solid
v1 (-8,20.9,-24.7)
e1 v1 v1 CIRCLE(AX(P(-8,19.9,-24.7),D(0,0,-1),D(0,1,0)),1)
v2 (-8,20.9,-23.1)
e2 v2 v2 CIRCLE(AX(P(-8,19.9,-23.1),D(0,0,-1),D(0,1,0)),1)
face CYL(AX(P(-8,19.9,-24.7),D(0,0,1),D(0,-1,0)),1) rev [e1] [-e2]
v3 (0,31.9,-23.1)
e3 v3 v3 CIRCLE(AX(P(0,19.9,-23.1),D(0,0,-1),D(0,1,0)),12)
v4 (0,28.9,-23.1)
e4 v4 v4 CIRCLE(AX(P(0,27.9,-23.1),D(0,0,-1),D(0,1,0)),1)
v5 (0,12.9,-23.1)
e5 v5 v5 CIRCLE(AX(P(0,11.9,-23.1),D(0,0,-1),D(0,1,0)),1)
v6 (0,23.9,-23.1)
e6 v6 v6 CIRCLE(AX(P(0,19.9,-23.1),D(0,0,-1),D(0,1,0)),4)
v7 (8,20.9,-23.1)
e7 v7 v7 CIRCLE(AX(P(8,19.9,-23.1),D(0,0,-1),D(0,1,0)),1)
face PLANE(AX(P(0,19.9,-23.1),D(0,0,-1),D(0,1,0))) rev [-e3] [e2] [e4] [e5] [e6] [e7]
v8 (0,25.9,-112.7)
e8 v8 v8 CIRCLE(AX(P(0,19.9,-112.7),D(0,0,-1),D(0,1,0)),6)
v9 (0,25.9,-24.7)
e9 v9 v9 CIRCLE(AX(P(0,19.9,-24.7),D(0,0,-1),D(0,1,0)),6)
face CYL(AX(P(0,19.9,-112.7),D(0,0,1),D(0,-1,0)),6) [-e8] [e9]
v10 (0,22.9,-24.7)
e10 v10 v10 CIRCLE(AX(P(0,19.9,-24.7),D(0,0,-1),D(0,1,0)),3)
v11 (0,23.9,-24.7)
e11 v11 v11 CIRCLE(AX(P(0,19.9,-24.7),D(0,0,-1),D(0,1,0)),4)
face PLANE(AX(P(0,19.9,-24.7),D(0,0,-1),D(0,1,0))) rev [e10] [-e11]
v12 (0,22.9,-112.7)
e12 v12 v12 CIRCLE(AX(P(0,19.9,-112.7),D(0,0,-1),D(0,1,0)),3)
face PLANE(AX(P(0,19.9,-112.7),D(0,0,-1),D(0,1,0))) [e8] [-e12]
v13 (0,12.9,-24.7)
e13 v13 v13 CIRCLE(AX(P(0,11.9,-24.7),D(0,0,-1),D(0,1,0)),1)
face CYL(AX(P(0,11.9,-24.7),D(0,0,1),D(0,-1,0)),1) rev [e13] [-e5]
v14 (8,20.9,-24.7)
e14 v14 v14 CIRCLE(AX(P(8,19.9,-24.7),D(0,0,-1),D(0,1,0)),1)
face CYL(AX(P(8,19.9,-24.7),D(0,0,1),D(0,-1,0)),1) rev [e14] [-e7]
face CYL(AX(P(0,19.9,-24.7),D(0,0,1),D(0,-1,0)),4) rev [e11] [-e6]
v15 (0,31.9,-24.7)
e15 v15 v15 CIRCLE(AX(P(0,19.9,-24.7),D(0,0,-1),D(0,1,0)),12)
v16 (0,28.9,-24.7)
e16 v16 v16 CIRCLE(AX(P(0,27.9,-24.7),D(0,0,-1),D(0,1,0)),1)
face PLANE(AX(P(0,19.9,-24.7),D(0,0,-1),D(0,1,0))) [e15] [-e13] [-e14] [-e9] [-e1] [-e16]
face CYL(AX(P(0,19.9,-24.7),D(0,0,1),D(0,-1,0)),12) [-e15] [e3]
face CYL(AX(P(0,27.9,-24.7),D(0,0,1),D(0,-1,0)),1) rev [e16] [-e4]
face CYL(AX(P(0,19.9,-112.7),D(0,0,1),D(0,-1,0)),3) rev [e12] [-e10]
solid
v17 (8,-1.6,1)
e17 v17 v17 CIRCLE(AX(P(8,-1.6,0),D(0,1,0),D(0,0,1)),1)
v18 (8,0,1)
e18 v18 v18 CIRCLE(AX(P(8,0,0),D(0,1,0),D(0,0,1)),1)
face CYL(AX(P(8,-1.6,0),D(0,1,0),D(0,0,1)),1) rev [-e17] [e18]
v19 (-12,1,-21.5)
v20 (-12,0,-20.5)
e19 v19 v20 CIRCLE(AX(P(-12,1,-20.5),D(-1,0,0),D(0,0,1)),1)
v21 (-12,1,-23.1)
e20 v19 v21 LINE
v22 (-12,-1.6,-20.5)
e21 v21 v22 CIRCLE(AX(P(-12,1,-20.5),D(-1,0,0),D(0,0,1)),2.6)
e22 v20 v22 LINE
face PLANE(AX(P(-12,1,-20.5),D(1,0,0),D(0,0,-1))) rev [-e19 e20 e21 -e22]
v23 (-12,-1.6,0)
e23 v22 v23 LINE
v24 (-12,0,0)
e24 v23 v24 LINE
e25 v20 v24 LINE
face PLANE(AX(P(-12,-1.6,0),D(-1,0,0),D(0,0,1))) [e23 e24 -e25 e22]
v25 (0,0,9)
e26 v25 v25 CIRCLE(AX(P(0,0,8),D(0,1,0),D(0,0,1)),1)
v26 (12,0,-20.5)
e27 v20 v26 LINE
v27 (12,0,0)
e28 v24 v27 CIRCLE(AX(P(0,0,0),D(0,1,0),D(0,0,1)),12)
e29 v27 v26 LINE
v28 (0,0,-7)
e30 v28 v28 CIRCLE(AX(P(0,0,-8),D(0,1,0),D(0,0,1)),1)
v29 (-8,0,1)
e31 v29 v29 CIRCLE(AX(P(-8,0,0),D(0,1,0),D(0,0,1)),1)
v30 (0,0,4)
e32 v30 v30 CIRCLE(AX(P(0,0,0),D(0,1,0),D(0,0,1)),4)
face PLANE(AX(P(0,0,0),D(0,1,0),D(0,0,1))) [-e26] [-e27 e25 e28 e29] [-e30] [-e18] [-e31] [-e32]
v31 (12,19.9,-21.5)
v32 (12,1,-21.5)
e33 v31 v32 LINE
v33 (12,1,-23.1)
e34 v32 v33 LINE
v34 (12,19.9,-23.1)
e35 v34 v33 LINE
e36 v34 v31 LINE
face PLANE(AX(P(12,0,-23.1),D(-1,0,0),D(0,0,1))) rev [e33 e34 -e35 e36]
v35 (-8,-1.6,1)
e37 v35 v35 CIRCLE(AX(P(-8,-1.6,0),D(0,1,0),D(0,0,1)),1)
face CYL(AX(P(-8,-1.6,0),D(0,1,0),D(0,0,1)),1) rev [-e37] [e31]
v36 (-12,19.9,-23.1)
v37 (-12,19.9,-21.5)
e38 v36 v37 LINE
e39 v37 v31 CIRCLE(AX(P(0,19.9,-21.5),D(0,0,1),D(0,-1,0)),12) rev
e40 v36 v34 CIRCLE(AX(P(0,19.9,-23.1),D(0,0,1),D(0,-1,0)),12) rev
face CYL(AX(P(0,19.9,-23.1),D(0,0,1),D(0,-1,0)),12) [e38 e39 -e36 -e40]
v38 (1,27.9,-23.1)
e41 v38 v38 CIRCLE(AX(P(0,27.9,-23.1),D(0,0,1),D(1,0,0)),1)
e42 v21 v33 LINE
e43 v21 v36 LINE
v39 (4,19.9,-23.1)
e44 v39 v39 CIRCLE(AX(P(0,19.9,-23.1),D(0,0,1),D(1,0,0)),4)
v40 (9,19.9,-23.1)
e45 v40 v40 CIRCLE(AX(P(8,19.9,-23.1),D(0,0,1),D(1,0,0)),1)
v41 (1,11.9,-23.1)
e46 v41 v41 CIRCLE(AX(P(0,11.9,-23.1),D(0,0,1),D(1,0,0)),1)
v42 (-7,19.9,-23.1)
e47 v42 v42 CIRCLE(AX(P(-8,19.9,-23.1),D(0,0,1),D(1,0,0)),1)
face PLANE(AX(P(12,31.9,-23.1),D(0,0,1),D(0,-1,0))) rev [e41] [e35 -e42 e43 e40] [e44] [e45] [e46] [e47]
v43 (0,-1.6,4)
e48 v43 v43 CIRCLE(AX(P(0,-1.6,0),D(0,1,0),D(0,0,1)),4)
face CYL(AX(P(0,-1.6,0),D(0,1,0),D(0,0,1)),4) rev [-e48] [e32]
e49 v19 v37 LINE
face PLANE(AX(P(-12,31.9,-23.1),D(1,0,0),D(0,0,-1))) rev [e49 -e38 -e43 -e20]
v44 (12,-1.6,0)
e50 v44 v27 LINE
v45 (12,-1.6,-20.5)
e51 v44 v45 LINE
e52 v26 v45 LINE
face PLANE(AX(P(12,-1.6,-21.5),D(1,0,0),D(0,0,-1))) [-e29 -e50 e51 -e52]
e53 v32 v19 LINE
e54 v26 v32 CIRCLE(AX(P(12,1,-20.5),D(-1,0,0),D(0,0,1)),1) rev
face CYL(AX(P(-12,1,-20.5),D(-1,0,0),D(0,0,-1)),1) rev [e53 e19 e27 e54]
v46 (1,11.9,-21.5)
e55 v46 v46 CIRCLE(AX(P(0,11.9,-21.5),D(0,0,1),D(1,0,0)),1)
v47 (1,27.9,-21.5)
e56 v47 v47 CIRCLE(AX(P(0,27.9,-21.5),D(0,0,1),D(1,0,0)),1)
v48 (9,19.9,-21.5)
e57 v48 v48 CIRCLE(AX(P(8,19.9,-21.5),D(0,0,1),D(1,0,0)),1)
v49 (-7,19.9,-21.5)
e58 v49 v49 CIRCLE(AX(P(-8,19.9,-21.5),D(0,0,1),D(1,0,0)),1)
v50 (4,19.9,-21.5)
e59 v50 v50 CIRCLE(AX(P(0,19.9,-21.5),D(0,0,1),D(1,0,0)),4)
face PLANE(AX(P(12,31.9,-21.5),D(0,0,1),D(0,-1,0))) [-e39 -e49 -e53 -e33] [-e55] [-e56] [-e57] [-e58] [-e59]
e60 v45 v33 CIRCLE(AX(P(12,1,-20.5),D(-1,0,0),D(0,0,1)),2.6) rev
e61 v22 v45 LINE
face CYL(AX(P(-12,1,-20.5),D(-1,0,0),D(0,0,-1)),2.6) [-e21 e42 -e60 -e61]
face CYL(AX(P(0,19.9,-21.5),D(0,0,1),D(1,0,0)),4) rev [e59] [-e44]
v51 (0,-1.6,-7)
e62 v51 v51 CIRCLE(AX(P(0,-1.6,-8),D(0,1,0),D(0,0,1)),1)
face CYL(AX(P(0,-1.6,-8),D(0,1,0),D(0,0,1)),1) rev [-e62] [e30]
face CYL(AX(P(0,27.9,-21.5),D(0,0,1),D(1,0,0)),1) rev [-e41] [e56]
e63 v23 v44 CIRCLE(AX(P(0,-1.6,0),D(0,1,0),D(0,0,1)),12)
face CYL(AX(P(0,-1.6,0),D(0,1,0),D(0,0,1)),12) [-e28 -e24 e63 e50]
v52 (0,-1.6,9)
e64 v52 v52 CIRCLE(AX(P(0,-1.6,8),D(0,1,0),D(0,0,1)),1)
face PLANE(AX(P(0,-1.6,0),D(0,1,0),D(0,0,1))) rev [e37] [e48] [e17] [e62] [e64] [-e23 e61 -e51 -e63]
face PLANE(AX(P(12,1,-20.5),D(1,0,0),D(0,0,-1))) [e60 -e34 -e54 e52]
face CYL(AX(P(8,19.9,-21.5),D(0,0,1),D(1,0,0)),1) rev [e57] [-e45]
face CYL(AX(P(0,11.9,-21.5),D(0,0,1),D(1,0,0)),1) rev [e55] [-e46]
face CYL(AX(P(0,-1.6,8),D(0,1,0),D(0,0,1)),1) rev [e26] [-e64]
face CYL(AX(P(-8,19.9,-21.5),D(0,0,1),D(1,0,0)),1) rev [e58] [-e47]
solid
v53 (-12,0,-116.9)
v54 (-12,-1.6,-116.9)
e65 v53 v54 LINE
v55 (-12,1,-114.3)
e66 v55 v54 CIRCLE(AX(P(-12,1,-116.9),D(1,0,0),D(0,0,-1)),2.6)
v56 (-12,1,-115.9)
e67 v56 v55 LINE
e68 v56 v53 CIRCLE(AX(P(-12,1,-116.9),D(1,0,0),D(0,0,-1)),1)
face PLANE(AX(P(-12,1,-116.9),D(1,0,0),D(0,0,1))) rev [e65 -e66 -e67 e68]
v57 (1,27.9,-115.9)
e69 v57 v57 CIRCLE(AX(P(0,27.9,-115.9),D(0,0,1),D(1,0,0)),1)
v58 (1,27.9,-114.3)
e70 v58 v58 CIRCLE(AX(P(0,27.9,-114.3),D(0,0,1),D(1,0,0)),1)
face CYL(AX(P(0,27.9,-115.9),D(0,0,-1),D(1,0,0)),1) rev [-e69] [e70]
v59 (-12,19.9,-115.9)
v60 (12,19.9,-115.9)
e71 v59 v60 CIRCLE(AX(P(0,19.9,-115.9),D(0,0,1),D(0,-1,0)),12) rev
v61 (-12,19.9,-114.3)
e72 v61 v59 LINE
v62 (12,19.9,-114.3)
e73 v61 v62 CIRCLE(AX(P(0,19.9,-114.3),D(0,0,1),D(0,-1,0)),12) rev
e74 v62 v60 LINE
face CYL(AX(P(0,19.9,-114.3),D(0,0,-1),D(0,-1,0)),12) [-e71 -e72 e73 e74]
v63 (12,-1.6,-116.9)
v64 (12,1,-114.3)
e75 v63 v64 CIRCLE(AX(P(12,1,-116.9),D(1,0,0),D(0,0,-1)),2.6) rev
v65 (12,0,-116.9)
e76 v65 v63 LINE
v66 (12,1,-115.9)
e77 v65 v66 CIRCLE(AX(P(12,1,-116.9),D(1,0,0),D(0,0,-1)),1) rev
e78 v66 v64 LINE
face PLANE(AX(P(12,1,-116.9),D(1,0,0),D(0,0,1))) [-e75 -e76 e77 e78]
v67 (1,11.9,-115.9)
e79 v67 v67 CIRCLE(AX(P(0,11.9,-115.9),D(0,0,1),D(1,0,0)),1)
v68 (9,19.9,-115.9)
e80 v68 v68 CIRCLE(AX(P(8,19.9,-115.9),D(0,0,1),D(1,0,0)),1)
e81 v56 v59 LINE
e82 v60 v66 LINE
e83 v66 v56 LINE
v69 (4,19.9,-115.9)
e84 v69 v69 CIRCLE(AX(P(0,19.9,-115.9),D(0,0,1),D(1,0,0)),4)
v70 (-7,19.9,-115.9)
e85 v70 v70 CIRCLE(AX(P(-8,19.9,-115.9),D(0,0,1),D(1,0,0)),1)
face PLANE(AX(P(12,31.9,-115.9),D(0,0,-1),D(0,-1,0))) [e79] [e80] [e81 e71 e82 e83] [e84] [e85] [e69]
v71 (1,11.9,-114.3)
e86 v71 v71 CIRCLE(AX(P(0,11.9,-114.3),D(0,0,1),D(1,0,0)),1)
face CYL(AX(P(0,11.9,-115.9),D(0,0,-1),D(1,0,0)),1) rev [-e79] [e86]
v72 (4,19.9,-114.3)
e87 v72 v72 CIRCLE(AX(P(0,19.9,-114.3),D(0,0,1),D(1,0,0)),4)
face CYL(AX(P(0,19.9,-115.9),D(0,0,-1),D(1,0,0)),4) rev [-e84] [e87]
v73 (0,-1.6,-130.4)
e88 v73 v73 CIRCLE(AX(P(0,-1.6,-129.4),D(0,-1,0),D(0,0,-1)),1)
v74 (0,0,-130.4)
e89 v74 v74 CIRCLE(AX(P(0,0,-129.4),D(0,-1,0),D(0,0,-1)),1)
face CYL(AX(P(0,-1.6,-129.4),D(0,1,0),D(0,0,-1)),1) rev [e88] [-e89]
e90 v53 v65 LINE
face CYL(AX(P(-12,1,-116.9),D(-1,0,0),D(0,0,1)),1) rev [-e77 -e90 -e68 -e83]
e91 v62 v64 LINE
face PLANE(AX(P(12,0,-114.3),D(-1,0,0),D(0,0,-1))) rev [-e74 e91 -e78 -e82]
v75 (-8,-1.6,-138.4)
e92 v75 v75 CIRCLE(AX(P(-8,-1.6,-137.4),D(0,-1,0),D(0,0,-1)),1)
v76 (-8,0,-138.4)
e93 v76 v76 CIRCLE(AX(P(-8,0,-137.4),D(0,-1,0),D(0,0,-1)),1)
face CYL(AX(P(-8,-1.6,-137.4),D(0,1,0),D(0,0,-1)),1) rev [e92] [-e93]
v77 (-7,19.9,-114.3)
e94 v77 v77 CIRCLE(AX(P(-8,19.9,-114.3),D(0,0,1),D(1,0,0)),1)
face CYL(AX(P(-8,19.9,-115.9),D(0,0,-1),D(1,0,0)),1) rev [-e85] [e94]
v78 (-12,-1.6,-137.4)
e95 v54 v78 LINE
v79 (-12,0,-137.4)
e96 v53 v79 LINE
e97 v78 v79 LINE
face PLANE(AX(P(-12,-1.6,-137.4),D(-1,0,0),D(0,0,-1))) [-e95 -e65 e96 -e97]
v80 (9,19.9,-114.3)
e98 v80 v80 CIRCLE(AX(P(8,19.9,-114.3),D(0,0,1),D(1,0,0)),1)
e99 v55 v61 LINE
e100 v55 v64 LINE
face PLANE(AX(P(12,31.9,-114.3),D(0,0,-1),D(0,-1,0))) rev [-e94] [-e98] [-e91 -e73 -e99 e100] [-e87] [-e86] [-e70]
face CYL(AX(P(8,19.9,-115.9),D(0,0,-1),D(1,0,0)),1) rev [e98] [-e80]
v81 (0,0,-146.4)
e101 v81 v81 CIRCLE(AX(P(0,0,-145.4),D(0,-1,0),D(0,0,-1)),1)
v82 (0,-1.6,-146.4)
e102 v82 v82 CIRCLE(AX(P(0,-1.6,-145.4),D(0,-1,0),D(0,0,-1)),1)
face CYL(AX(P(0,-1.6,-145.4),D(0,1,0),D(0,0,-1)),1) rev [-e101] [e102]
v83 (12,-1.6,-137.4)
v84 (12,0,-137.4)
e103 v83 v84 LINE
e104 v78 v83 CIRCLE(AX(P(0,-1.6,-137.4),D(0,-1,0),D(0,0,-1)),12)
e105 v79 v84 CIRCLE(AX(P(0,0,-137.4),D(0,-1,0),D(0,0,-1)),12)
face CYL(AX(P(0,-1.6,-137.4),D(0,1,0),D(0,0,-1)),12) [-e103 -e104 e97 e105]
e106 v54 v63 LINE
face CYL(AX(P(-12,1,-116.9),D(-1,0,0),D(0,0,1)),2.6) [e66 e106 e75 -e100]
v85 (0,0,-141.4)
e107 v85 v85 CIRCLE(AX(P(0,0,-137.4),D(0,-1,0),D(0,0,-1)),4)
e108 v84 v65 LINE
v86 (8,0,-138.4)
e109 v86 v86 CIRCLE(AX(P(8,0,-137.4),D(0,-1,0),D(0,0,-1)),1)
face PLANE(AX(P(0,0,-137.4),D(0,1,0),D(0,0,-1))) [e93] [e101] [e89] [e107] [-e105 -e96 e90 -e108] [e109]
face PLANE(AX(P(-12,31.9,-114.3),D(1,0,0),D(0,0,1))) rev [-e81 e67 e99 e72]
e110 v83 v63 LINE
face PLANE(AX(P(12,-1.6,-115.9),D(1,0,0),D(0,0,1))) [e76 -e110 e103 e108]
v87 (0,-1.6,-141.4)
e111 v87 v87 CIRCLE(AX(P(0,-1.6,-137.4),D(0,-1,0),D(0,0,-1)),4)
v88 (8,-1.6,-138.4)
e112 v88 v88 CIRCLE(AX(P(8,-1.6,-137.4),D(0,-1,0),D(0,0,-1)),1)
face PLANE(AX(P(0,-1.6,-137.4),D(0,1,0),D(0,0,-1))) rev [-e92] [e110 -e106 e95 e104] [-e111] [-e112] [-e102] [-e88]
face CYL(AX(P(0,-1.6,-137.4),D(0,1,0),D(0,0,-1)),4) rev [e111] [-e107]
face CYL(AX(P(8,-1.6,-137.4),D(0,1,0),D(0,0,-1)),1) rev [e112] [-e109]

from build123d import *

# Parameters (mm, degrees)
SKETCH1_R                    = 4
SKETCH1_R_2                  = 1
BASE_FLANGE1_DEPTH           = 1.6
EDGE_FLANGE1_STRIP_W         = 8.4
EDGE_FLANGE1_STRIP_H         = 1.6
EDGE_FLANGE1_STRIP_CUT_DEPTH = 24
EDGE_FLANGE1_DEPTH           = 24
CUT_EXTRUDE1_REACH           = 49.79
SKETCH8_R                    = 4
SKETCH8_R_2                  = 1
SKETCH9_R                    = 12
SKETCH9_R_2                  = 1
SKETCH9_R_3                  = 4
BOSS_EXTRUDE1_DEPTH          = 1.6
SKETCH10_R                   = 6
SKETCH10_R_2                 = 3
BOSS_EXTRUDE2_DEPTH          = 88


# Sheet-metal steps are written as plain solids
with BuildPart() as part:
    # Sketch1 → Base-Flange1 (new body)
    with BuildSketch(Plane(origin=(0, 0, 0), x_dir=(1, 0, 0), z_dir=(0, 1, 0))):
        with BuildLine():
            Line((-12, 0), (-12, 21.5))
            Line((-12, 21.5), (12, 21.5))
            Line((12, 21.5), (12, 0))
            ThreePointArc((12, 0), (0, -12), (-12, 0))
        make_face()
        with Locations(Location((0, 0, 0), (0, 0, 270))):
            Circle(SKETCH1_R, mode=Mode.SUBTRACT)
        with Locations(Location((8, 0, 0), (0, 0, 270))):
            Circle(SKETCH1_R_2, mode=Mode.SUBTRACT)
        with Locations(Location((0, -8, 0), (0, 0, 270))):
            Circle(SKETCH1_R_2, mode=Mode.SUBTRACT)
        with Locations(Location((-8, 0, 0), (0, 0, 270))):
            Circle(SKETCH1_R_2, mode=Mode.SUBTRACT)
        with Locations(Location((0, 8, 0), (0, 0, 270))):
            Circle(SKETCH1_R_2, mode=Mode.SUBTRACT)
    extrude(amount=-BASE_FLANGE1_DEPTH)

    # Edge-Flange1 strip (across the edge) → Edge-Flange1 strip cut (cut)
    with BuildSketch(Plane(origin=(12, 0, -21.5), x_dir=(0, 0, 1), z_dir=(-1, 0, 0))):
        with Locations((-3.2, -0.8)):
            Rectangle(EDGE_FLANGE1_STRIP_W, EDGE_FLANGE1_STRIP_H)
    extrude(amount=EDGE_FLANGE1_STRIP_CUT_DEPTH, mode=Mode.SUBTRACT)

    # Edge-Flange1 section (across the edge) → Edge-Flange1 (add)
    with BuildSketch(Plane(origin=(12, 0, -21.5), x_dir=(0, 0, 1), z_dir=(-1, 0, 0))):
        with BuildLine():
            Line((-1.6, 1), (-1.6, 31.9))
            Line((-1.6, 31.9), (0, 31.9))
            Line((0, 31.9), (0, 1))
            ThreePointArc((0, 1), (0.292893219, 0.292893219), (1, 0))
            Line((1, 0), (1, -1.6))
            ThreePointArc((1, -1.6), (-0.838477631, -0.838477631), (-1.6, 1))
        make_face()
    extrude(amount=EDGE_FLANGE1_DEPTH)

    # Sketch8 → Cut-Extrude1 (cut, up to next)
    with BuildSketch(Plane.XY.offset(-21.5), mode=Mode.PRIVATE) as cut_extrude1_sk1:
        with BuildLine():
            Line((-12, 31.9), (-12, 19.9))
            ThreePointArc((-12, 19.9), (-8.485281374, 28.385281374), (0, 31.9))
            Line((0, 31.9), (-12, 31.9))
        make_face()
    cut_extrude1_tool1 = extrude(cut_extrude1_sk1.sketch, amount=-CUT_EXTRUDE1_REACH, mode=Mode.PRIVATE) & part.part
    # Sketch8 → Cut-Extrude1 (cut, up to next)
    with BuildSketch(Plane.XY.offset(-21.5), mode=Mode.PRIVATE) as cut_extrude1_sk2:
        with BuildLine():
            Line((12, 31.9), (0, 31.9))
            ThreePointArc((0, 31.9), (8.485281374, 28.385281374), (12, 19.9))
            Line((12, 19.9), (12, 31.9))
        make_face()
    cut_extrude1_tool2 = extrude(cut_extrude1_sk2.sketch, amount=-CUT_EXTRUDE1_REACH, mode=Mode.PRIVATE) & part.part
    # Sketch8 → Cut-Extrude1 (cut, up to next)
    with BuildSketch(Plane.XY.offset(-21.5), mode=Mode.PRIVATE) as cut_extrude1_sk3:
        with Locations((0, 19.9)):
            Circle(SKETCH8_R)
    cut_extrude1_tool3 = extrude(cut_extrude1_sk3.sketch, amount=-CUT_EXTRUDE1_REACH, mode=Mode.PRIVATE) & part.part
    # Sketch8 → Cut-Extrude1 (cut, up to next)
    with BuildSketch(Plane.XY.offset(-21.5), mode=Mode.PRIVATE) as cut_extrude1_sk4:
        with Locations((-8, 19.9)):
            Circle(SKETCH8_R_2)
    cut_extrude1_tool4 = extrude(cut_extrude1_sk4.sketch, amount=-CUT_EXTRUDE1_REACH, mode=Mode.PRIVATE) & part.part
    # Sketch8 → Cut-Extrude1 (cut, up to next)
    with BuildSketch(Plane.XY.offset(-21.5), mode=Mode.PRIVATE) as cut_extrude1_sk5:
        with Locations((0, 27.9)):
            Circle(SKETCH8_R_2)
    cut_extrude1_tool5 = extrude(cut_extrude1_sk5.sketch, amount=-CUT_EXTRUDE1_REACH, mode=Mode.PRIVATE) & part.part
    # Sketch8 → Cut-Extrude1 (cut, up to next)
    with BuildSketch(Plane.XY.offset(-21.5), mode=Mode.PRIVATE) as cut_extrude1_sk6:
        with Locations((8, 19.9)):
            Circle(SKETCH8_R_2)
    cut_extrude1_tool6 = extrude(cut_extrude1_sk6.sketch, amount=-CUT_EXTRUDE1_REACH, mode=Mode.PRIVATE) & part.part
    # Sketch8 → Cut-Extrude1 (cut, up to next)
    with BuildSketch(Plane.XY.offset(-21.5), mode=Mode.PRIVATE) as cut_extrude1_sk7:
        with Locations((0, 11.9)):
            Circle(SKETCH8_R_2)
    cut_extrude1_tool7 = extrude(cut_extrude1_sk7.sketch, amount=-CUT_EXTRUDE1_REACH, mode=Mode.PRIVATE) & part.part
    add(cut_extrude1_tool1.solids().sort_by_distance((-9.319585, 29.219585, -21.5))[0], mode=Mode.SUBTRACT)
    add(cut_extrude1_tool2.solids().sort_by_distance((9.319585, 29.219585, -21.5))[0], mode=Mode.SUBTRACT)
    add(cut_extrude1_tool3.solids().sort_by_distance((0, 19.9, -21.5))[0], mode=Mode.SUBTRACT)
    add(cut_extrude1_tool4.solids().sort_by_distance((-8, 19.9, -21.5))[0], mode=Mode.SUBTRACT)
    add(cut_extrude1_tool5.solids().sort_by_distance((0, 27.9, -21.5))[0], mode=Mode.SUBTRACT)
    add(cut_extrude1_tool6.solids().sort_by_distance((8, 19.9, -21.5))[0], mode=Mode.SUBTRACT)
    add(cut_extrude1_tool7.solids().sort_by_distance((0, 11.9, -21.5))[0], mode=Mode.SUBTRACT)


with BuildPart() as body_2:
    # Sketch9 → Boss-Extrude1 (new body)
    with BuildSketch(Plane(origin=(0, 0, -23.1), x_dir=(-1, 0, 0), z_dir=(0, 0, -1))):
        with Locations(Location((0, 19.9, 0), (0, 0, 90))):
            Circle(SKETCH9_R)
        with Locations(Location((0, 27.9, 0), (0, 0, 90))):
            Circle(SKETCH9_R_2, mode=Mode.SUBTRACT)
        with Locations(Location((8, 19.9, 0), (0, 0, 90))):
            Circle(SKETCH9_R_2, mode=Mode.SUBTRACT)
        with Locations(Location((0, 19.9, 0), (0, 0, 90))):
            Circle(SKETCH9_R_3, mode=Mode.SUBTRACT)
        with Locations(Location((-8, 19.9, 0), (0, 0, 90))):
            Circle(SKETCH9_R_2, mode=Mode.SUBTRACT)
        with Locations(Location((0, 11.9, 0), (0, 0, 90))):
            Circle(SKETCH9_R_2, mode=Mode.SUBTRACT)
    extrude(amount=BOSS_EXTRUDE1_DEPTH)

    # Sketch10 → Boss-Extrude2 (add)
    with BuildSketch(Plane(origin=(0, 0, -24.7), x_dir=(-1, 0, 0), z_dir=(0, 0, -1))):
        with Locations(Location((0, 19.9, 0), (0, 0, 90))):
            Circle(SKETCH10_R)
        with Locations(Location((0, 19.9, 0), (0, 0, 90))):
            Circle(SKETCH10_R_2, mode=Mode.SUBTRACT)
    extrude(amount=BOSS_EXTRUDE2_DEPTH)


with BuildPart() as body_3:
    # Mirror1: mirrored copy
    add(part.part.mirror(Plane(origin=(0, 0, -68.7), x_dir=(1, 0, 0), z_dir=(0, 0, -1))))


solid = Compound([part.part, body_2.part, body_3.part])
